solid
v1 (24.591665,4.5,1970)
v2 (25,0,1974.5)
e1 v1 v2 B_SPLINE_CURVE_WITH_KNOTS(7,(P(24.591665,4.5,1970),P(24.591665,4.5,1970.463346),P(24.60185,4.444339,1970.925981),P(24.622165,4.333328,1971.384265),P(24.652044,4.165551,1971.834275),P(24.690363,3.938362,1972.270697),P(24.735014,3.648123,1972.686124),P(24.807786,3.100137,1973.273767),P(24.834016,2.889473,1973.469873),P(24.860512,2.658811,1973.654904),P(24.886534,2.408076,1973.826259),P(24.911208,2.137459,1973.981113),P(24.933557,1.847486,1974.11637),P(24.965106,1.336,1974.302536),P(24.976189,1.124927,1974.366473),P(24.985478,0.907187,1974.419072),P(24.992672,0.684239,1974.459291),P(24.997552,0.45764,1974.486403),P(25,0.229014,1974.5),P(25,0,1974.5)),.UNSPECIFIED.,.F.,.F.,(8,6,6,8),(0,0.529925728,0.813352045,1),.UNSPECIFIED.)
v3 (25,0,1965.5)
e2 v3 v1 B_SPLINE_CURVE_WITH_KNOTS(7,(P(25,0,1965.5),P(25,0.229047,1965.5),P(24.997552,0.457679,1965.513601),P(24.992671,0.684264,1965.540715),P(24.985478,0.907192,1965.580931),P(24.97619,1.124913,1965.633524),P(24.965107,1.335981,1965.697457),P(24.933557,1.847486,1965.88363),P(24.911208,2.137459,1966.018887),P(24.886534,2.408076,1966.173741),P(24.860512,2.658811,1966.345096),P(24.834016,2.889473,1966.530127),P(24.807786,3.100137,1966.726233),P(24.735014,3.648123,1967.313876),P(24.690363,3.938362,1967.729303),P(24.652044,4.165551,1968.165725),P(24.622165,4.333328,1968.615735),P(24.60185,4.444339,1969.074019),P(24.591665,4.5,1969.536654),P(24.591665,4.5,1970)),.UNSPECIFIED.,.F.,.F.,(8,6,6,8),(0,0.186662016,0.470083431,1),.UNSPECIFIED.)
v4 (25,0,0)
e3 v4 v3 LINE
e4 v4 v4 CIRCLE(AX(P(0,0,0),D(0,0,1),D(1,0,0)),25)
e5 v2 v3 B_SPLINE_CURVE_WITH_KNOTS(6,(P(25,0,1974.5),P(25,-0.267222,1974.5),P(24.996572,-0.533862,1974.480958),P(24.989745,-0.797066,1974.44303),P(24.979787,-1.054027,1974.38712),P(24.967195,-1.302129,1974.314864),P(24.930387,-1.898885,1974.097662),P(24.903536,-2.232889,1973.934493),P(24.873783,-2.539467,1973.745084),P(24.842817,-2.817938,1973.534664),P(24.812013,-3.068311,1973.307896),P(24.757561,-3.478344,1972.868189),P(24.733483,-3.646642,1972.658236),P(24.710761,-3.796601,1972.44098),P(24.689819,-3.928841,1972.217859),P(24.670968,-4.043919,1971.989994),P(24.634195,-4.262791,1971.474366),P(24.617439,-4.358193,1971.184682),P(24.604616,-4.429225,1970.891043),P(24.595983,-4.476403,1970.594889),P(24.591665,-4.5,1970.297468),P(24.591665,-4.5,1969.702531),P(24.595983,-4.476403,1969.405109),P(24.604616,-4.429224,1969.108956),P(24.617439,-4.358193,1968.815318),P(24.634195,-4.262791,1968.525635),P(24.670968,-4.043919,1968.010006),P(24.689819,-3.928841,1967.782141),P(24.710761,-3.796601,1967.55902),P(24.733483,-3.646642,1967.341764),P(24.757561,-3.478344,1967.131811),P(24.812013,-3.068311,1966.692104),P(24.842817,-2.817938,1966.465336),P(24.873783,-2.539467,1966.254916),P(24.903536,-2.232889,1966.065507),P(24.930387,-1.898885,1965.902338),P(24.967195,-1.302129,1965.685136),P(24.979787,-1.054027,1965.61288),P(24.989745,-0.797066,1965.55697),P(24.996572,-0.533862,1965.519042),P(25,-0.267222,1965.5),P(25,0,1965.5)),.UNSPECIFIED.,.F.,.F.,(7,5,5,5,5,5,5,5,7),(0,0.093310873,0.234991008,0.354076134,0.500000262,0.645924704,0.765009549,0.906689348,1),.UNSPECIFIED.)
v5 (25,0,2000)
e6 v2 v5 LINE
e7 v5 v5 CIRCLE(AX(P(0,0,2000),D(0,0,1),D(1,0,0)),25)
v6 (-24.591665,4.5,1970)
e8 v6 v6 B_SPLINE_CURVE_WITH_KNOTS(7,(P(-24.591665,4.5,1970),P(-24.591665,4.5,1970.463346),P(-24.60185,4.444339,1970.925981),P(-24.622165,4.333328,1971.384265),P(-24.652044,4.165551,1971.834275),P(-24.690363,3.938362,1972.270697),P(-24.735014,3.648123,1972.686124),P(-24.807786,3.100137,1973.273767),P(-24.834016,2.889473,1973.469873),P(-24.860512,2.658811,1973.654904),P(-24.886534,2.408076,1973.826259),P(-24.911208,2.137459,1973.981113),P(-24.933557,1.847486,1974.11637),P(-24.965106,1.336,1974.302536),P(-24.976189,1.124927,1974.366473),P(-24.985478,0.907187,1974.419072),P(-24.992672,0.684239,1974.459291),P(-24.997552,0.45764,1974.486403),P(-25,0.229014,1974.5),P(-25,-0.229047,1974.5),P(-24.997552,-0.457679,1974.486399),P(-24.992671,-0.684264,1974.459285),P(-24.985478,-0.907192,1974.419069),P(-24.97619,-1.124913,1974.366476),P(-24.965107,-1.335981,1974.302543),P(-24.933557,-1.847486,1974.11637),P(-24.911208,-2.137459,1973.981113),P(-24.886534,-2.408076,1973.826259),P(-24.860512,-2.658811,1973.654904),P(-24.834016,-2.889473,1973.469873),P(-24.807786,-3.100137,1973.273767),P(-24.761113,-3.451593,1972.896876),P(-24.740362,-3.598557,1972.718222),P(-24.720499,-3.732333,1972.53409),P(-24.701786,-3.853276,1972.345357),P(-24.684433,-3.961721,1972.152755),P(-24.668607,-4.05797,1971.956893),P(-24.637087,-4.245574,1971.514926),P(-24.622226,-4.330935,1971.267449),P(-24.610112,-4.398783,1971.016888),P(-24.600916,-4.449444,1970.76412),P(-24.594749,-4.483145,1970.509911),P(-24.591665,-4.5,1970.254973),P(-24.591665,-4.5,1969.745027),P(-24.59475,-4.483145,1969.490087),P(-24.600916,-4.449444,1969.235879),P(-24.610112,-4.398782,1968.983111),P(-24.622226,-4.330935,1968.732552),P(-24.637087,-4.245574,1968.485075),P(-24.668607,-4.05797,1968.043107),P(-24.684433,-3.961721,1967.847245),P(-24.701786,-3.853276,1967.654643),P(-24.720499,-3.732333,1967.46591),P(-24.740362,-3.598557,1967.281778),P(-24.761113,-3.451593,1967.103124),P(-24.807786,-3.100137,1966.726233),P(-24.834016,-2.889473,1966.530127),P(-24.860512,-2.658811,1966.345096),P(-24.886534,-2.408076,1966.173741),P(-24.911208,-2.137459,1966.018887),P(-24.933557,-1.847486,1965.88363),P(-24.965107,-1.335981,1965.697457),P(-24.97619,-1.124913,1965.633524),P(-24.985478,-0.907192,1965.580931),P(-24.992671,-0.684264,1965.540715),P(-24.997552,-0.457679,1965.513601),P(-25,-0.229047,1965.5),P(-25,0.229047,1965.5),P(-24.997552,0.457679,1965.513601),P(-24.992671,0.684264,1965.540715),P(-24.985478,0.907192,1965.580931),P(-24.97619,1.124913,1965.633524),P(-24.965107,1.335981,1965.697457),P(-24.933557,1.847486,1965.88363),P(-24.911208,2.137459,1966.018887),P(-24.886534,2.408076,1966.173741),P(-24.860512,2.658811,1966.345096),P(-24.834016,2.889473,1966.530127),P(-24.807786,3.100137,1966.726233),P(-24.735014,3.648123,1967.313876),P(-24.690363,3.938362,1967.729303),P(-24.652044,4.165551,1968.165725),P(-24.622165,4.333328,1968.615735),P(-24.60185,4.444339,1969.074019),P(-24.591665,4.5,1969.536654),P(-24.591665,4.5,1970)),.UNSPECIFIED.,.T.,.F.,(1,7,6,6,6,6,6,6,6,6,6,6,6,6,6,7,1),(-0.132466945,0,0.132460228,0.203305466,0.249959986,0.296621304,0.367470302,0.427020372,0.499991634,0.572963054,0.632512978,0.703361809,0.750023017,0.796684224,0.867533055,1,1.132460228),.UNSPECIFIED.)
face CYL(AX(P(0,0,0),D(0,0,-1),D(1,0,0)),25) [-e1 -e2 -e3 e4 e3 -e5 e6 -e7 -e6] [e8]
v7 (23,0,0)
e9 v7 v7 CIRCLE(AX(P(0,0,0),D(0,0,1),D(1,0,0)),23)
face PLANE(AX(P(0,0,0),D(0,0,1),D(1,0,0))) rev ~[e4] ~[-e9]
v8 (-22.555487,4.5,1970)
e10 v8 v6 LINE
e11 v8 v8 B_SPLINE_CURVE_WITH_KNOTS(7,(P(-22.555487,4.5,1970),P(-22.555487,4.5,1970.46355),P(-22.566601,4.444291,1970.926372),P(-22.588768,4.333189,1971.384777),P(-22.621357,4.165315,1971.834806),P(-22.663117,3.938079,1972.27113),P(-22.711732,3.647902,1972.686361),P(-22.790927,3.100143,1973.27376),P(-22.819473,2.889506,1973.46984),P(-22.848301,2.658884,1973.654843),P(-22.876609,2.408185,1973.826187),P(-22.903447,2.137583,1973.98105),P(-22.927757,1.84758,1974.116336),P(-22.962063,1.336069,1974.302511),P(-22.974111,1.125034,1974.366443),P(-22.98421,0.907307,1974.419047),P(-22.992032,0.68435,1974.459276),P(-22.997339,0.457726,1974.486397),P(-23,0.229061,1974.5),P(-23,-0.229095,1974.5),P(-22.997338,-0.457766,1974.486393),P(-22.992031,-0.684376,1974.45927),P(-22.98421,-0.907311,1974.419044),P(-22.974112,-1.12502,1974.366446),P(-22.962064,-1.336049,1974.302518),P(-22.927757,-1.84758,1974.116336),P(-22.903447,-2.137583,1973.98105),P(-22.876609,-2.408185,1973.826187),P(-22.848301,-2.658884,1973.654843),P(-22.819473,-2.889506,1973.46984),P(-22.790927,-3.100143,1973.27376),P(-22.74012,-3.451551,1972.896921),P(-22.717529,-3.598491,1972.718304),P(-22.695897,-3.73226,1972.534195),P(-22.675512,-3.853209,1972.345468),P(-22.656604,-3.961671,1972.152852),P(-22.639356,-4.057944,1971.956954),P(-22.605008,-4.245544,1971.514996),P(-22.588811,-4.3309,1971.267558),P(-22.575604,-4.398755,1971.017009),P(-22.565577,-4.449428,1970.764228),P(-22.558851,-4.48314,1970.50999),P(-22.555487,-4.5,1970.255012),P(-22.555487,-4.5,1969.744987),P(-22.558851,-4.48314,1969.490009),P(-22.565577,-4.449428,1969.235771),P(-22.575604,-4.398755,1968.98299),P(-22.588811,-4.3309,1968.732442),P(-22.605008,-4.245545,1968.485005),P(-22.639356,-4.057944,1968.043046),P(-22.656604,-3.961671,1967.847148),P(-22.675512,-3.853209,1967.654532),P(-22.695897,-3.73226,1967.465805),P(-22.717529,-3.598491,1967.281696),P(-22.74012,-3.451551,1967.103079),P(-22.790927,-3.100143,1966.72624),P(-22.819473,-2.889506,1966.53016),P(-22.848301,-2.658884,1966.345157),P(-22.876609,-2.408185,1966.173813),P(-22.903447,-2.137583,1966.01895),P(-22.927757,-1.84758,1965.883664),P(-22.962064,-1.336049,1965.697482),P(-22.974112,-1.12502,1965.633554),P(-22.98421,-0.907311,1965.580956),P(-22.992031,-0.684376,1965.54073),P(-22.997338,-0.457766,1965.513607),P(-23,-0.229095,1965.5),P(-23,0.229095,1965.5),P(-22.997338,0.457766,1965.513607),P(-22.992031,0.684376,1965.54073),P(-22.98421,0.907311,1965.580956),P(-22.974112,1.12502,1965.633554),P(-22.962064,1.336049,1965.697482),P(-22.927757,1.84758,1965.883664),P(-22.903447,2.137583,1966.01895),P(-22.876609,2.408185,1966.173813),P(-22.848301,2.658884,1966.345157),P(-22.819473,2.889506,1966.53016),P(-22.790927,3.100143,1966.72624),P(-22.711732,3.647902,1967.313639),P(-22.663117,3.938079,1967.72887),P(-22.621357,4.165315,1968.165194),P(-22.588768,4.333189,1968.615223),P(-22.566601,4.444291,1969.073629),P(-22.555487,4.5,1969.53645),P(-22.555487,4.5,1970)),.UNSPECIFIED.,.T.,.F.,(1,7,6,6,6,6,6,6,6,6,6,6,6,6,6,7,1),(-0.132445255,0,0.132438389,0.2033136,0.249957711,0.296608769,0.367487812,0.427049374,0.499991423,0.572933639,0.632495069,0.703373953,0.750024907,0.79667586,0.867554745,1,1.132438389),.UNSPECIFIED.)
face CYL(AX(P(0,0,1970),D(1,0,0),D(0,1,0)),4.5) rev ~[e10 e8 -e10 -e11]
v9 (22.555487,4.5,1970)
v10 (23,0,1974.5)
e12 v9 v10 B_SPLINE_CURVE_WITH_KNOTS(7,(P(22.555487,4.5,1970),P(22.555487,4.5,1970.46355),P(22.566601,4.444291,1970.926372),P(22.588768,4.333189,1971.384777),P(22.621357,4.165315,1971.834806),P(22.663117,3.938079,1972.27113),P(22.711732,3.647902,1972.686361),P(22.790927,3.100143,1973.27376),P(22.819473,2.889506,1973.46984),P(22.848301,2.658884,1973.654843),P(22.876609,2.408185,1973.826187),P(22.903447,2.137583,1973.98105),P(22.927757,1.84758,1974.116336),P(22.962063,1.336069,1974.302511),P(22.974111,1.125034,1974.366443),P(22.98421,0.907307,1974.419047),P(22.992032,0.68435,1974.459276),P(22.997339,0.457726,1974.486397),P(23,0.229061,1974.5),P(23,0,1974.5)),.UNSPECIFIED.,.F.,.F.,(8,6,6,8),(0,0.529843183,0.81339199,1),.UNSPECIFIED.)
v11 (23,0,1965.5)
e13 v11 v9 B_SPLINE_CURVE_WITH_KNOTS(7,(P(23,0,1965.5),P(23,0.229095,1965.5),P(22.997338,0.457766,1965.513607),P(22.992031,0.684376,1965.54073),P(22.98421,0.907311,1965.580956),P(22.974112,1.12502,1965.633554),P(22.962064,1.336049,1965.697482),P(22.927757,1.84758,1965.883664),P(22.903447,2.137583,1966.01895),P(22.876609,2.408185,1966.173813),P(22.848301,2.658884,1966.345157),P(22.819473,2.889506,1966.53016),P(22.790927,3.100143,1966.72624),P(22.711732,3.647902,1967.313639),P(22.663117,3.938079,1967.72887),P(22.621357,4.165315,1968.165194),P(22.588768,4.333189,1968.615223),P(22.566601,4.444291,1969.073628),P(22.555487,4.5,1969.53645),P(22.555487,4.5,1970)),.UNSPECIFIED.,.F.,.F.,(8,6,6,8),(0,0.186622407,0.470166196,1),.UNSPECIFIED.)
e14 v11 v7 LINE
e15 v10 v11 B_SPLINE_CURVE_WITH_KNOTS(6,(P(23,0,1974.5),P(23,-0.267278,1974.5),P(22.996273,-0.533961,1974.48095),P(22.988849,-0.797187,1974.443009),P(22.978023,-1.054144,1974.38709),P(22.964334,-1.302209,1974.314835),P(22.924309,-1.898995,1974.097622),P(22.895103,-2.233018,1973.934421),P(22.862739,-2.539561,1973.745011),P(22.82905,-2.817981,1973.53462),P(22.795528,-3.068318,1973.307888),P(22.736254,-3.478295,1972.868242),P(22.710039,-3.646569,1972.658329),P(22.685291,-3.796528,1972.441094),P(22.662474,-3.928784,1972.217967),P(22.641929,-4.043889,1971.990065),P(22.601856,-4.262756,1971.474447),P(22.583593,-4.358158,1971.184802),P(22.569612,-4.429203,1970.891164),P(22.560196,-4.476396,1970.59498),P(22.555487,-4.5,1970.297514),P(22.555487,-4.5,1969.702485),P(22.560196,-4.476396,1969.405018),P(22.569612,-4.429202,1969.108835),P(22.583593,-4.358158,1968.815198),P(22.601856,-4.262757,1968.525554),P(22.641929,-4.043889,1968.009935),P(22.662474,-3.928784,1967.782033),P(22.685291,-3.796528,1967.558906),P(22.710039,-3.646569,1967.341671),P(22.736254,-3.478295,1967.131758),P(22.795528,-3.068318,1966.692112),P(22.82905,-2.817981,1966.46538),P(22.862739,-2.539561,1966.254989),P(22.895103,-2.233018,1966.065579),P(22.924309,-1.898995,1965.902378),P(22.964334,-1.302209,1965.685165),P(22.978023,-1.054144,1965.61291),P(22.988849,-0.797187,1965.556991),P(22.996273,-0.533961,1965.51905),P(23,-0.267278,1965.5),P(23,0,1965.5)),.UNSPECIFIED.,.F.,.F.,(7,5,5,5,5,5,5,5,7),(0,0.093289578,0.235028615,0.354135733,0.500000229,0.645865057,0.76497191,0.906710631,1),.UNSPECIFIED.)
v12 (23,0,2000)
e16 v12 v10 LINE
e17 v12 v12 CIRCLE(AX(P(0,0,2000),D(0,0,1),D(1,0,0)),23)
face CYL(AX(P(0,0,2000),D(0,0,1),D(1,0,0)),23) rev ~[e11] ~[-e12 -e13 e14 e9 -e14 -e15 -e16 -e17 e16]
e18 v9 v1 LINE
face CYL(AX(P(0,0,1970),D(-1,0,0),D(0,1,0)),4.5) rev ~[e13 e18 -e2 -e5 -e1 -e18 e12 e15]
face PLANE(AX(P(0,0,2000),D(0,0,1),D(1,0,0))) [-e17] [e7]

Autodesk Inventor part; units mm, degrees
ref_plane "YZ Plane" through (0, 0, 0) normal (1, 0, 0) x (0, 1, 0)
ref_plane "XZ Plane" through (0, 0, 0) normal (0, 1, 0) x (-1, 0, 0)
ref_plane "XY Plane" through (0, 0, 0) normal (0, 0, 1) x (1, 0, 0)
sketch "Sketch1" plane through (0, 0, 0) normal (0, 0, 1) x (1, 0, 0)
  circle A0 centre (0, 0) radius 25
  dimension "d0" = 50
extrude "Extrusion1" add sketch "Sketch1" along normal blind 2000
sketch "Sketch2" plane through (0, 0, 2000) normal (0, 0, 1) x (1, 0, 0)
  circle A0 centre (0, 0) radius 23
  dimension "d3" = 46
extrude "Extrusion2" cut sketch "Sketch2" against normal blind 2000
sketch "Sketch3" plane through (0, 0, 0) normal (1, 0, 0) x (0, 1, 0)
  circle A0 centre (0, 1970) radius 4.5
  line L0 (25, 2000) -> (-25, 2000) projected
  point P0 (0, 0)
  dimension "d6" = 9
  dimension "d7" = 30
extrude "Extrusion3" cut sketch "Sketch3" along normal through all both and the other way through all
properties part number "Odnogi"
